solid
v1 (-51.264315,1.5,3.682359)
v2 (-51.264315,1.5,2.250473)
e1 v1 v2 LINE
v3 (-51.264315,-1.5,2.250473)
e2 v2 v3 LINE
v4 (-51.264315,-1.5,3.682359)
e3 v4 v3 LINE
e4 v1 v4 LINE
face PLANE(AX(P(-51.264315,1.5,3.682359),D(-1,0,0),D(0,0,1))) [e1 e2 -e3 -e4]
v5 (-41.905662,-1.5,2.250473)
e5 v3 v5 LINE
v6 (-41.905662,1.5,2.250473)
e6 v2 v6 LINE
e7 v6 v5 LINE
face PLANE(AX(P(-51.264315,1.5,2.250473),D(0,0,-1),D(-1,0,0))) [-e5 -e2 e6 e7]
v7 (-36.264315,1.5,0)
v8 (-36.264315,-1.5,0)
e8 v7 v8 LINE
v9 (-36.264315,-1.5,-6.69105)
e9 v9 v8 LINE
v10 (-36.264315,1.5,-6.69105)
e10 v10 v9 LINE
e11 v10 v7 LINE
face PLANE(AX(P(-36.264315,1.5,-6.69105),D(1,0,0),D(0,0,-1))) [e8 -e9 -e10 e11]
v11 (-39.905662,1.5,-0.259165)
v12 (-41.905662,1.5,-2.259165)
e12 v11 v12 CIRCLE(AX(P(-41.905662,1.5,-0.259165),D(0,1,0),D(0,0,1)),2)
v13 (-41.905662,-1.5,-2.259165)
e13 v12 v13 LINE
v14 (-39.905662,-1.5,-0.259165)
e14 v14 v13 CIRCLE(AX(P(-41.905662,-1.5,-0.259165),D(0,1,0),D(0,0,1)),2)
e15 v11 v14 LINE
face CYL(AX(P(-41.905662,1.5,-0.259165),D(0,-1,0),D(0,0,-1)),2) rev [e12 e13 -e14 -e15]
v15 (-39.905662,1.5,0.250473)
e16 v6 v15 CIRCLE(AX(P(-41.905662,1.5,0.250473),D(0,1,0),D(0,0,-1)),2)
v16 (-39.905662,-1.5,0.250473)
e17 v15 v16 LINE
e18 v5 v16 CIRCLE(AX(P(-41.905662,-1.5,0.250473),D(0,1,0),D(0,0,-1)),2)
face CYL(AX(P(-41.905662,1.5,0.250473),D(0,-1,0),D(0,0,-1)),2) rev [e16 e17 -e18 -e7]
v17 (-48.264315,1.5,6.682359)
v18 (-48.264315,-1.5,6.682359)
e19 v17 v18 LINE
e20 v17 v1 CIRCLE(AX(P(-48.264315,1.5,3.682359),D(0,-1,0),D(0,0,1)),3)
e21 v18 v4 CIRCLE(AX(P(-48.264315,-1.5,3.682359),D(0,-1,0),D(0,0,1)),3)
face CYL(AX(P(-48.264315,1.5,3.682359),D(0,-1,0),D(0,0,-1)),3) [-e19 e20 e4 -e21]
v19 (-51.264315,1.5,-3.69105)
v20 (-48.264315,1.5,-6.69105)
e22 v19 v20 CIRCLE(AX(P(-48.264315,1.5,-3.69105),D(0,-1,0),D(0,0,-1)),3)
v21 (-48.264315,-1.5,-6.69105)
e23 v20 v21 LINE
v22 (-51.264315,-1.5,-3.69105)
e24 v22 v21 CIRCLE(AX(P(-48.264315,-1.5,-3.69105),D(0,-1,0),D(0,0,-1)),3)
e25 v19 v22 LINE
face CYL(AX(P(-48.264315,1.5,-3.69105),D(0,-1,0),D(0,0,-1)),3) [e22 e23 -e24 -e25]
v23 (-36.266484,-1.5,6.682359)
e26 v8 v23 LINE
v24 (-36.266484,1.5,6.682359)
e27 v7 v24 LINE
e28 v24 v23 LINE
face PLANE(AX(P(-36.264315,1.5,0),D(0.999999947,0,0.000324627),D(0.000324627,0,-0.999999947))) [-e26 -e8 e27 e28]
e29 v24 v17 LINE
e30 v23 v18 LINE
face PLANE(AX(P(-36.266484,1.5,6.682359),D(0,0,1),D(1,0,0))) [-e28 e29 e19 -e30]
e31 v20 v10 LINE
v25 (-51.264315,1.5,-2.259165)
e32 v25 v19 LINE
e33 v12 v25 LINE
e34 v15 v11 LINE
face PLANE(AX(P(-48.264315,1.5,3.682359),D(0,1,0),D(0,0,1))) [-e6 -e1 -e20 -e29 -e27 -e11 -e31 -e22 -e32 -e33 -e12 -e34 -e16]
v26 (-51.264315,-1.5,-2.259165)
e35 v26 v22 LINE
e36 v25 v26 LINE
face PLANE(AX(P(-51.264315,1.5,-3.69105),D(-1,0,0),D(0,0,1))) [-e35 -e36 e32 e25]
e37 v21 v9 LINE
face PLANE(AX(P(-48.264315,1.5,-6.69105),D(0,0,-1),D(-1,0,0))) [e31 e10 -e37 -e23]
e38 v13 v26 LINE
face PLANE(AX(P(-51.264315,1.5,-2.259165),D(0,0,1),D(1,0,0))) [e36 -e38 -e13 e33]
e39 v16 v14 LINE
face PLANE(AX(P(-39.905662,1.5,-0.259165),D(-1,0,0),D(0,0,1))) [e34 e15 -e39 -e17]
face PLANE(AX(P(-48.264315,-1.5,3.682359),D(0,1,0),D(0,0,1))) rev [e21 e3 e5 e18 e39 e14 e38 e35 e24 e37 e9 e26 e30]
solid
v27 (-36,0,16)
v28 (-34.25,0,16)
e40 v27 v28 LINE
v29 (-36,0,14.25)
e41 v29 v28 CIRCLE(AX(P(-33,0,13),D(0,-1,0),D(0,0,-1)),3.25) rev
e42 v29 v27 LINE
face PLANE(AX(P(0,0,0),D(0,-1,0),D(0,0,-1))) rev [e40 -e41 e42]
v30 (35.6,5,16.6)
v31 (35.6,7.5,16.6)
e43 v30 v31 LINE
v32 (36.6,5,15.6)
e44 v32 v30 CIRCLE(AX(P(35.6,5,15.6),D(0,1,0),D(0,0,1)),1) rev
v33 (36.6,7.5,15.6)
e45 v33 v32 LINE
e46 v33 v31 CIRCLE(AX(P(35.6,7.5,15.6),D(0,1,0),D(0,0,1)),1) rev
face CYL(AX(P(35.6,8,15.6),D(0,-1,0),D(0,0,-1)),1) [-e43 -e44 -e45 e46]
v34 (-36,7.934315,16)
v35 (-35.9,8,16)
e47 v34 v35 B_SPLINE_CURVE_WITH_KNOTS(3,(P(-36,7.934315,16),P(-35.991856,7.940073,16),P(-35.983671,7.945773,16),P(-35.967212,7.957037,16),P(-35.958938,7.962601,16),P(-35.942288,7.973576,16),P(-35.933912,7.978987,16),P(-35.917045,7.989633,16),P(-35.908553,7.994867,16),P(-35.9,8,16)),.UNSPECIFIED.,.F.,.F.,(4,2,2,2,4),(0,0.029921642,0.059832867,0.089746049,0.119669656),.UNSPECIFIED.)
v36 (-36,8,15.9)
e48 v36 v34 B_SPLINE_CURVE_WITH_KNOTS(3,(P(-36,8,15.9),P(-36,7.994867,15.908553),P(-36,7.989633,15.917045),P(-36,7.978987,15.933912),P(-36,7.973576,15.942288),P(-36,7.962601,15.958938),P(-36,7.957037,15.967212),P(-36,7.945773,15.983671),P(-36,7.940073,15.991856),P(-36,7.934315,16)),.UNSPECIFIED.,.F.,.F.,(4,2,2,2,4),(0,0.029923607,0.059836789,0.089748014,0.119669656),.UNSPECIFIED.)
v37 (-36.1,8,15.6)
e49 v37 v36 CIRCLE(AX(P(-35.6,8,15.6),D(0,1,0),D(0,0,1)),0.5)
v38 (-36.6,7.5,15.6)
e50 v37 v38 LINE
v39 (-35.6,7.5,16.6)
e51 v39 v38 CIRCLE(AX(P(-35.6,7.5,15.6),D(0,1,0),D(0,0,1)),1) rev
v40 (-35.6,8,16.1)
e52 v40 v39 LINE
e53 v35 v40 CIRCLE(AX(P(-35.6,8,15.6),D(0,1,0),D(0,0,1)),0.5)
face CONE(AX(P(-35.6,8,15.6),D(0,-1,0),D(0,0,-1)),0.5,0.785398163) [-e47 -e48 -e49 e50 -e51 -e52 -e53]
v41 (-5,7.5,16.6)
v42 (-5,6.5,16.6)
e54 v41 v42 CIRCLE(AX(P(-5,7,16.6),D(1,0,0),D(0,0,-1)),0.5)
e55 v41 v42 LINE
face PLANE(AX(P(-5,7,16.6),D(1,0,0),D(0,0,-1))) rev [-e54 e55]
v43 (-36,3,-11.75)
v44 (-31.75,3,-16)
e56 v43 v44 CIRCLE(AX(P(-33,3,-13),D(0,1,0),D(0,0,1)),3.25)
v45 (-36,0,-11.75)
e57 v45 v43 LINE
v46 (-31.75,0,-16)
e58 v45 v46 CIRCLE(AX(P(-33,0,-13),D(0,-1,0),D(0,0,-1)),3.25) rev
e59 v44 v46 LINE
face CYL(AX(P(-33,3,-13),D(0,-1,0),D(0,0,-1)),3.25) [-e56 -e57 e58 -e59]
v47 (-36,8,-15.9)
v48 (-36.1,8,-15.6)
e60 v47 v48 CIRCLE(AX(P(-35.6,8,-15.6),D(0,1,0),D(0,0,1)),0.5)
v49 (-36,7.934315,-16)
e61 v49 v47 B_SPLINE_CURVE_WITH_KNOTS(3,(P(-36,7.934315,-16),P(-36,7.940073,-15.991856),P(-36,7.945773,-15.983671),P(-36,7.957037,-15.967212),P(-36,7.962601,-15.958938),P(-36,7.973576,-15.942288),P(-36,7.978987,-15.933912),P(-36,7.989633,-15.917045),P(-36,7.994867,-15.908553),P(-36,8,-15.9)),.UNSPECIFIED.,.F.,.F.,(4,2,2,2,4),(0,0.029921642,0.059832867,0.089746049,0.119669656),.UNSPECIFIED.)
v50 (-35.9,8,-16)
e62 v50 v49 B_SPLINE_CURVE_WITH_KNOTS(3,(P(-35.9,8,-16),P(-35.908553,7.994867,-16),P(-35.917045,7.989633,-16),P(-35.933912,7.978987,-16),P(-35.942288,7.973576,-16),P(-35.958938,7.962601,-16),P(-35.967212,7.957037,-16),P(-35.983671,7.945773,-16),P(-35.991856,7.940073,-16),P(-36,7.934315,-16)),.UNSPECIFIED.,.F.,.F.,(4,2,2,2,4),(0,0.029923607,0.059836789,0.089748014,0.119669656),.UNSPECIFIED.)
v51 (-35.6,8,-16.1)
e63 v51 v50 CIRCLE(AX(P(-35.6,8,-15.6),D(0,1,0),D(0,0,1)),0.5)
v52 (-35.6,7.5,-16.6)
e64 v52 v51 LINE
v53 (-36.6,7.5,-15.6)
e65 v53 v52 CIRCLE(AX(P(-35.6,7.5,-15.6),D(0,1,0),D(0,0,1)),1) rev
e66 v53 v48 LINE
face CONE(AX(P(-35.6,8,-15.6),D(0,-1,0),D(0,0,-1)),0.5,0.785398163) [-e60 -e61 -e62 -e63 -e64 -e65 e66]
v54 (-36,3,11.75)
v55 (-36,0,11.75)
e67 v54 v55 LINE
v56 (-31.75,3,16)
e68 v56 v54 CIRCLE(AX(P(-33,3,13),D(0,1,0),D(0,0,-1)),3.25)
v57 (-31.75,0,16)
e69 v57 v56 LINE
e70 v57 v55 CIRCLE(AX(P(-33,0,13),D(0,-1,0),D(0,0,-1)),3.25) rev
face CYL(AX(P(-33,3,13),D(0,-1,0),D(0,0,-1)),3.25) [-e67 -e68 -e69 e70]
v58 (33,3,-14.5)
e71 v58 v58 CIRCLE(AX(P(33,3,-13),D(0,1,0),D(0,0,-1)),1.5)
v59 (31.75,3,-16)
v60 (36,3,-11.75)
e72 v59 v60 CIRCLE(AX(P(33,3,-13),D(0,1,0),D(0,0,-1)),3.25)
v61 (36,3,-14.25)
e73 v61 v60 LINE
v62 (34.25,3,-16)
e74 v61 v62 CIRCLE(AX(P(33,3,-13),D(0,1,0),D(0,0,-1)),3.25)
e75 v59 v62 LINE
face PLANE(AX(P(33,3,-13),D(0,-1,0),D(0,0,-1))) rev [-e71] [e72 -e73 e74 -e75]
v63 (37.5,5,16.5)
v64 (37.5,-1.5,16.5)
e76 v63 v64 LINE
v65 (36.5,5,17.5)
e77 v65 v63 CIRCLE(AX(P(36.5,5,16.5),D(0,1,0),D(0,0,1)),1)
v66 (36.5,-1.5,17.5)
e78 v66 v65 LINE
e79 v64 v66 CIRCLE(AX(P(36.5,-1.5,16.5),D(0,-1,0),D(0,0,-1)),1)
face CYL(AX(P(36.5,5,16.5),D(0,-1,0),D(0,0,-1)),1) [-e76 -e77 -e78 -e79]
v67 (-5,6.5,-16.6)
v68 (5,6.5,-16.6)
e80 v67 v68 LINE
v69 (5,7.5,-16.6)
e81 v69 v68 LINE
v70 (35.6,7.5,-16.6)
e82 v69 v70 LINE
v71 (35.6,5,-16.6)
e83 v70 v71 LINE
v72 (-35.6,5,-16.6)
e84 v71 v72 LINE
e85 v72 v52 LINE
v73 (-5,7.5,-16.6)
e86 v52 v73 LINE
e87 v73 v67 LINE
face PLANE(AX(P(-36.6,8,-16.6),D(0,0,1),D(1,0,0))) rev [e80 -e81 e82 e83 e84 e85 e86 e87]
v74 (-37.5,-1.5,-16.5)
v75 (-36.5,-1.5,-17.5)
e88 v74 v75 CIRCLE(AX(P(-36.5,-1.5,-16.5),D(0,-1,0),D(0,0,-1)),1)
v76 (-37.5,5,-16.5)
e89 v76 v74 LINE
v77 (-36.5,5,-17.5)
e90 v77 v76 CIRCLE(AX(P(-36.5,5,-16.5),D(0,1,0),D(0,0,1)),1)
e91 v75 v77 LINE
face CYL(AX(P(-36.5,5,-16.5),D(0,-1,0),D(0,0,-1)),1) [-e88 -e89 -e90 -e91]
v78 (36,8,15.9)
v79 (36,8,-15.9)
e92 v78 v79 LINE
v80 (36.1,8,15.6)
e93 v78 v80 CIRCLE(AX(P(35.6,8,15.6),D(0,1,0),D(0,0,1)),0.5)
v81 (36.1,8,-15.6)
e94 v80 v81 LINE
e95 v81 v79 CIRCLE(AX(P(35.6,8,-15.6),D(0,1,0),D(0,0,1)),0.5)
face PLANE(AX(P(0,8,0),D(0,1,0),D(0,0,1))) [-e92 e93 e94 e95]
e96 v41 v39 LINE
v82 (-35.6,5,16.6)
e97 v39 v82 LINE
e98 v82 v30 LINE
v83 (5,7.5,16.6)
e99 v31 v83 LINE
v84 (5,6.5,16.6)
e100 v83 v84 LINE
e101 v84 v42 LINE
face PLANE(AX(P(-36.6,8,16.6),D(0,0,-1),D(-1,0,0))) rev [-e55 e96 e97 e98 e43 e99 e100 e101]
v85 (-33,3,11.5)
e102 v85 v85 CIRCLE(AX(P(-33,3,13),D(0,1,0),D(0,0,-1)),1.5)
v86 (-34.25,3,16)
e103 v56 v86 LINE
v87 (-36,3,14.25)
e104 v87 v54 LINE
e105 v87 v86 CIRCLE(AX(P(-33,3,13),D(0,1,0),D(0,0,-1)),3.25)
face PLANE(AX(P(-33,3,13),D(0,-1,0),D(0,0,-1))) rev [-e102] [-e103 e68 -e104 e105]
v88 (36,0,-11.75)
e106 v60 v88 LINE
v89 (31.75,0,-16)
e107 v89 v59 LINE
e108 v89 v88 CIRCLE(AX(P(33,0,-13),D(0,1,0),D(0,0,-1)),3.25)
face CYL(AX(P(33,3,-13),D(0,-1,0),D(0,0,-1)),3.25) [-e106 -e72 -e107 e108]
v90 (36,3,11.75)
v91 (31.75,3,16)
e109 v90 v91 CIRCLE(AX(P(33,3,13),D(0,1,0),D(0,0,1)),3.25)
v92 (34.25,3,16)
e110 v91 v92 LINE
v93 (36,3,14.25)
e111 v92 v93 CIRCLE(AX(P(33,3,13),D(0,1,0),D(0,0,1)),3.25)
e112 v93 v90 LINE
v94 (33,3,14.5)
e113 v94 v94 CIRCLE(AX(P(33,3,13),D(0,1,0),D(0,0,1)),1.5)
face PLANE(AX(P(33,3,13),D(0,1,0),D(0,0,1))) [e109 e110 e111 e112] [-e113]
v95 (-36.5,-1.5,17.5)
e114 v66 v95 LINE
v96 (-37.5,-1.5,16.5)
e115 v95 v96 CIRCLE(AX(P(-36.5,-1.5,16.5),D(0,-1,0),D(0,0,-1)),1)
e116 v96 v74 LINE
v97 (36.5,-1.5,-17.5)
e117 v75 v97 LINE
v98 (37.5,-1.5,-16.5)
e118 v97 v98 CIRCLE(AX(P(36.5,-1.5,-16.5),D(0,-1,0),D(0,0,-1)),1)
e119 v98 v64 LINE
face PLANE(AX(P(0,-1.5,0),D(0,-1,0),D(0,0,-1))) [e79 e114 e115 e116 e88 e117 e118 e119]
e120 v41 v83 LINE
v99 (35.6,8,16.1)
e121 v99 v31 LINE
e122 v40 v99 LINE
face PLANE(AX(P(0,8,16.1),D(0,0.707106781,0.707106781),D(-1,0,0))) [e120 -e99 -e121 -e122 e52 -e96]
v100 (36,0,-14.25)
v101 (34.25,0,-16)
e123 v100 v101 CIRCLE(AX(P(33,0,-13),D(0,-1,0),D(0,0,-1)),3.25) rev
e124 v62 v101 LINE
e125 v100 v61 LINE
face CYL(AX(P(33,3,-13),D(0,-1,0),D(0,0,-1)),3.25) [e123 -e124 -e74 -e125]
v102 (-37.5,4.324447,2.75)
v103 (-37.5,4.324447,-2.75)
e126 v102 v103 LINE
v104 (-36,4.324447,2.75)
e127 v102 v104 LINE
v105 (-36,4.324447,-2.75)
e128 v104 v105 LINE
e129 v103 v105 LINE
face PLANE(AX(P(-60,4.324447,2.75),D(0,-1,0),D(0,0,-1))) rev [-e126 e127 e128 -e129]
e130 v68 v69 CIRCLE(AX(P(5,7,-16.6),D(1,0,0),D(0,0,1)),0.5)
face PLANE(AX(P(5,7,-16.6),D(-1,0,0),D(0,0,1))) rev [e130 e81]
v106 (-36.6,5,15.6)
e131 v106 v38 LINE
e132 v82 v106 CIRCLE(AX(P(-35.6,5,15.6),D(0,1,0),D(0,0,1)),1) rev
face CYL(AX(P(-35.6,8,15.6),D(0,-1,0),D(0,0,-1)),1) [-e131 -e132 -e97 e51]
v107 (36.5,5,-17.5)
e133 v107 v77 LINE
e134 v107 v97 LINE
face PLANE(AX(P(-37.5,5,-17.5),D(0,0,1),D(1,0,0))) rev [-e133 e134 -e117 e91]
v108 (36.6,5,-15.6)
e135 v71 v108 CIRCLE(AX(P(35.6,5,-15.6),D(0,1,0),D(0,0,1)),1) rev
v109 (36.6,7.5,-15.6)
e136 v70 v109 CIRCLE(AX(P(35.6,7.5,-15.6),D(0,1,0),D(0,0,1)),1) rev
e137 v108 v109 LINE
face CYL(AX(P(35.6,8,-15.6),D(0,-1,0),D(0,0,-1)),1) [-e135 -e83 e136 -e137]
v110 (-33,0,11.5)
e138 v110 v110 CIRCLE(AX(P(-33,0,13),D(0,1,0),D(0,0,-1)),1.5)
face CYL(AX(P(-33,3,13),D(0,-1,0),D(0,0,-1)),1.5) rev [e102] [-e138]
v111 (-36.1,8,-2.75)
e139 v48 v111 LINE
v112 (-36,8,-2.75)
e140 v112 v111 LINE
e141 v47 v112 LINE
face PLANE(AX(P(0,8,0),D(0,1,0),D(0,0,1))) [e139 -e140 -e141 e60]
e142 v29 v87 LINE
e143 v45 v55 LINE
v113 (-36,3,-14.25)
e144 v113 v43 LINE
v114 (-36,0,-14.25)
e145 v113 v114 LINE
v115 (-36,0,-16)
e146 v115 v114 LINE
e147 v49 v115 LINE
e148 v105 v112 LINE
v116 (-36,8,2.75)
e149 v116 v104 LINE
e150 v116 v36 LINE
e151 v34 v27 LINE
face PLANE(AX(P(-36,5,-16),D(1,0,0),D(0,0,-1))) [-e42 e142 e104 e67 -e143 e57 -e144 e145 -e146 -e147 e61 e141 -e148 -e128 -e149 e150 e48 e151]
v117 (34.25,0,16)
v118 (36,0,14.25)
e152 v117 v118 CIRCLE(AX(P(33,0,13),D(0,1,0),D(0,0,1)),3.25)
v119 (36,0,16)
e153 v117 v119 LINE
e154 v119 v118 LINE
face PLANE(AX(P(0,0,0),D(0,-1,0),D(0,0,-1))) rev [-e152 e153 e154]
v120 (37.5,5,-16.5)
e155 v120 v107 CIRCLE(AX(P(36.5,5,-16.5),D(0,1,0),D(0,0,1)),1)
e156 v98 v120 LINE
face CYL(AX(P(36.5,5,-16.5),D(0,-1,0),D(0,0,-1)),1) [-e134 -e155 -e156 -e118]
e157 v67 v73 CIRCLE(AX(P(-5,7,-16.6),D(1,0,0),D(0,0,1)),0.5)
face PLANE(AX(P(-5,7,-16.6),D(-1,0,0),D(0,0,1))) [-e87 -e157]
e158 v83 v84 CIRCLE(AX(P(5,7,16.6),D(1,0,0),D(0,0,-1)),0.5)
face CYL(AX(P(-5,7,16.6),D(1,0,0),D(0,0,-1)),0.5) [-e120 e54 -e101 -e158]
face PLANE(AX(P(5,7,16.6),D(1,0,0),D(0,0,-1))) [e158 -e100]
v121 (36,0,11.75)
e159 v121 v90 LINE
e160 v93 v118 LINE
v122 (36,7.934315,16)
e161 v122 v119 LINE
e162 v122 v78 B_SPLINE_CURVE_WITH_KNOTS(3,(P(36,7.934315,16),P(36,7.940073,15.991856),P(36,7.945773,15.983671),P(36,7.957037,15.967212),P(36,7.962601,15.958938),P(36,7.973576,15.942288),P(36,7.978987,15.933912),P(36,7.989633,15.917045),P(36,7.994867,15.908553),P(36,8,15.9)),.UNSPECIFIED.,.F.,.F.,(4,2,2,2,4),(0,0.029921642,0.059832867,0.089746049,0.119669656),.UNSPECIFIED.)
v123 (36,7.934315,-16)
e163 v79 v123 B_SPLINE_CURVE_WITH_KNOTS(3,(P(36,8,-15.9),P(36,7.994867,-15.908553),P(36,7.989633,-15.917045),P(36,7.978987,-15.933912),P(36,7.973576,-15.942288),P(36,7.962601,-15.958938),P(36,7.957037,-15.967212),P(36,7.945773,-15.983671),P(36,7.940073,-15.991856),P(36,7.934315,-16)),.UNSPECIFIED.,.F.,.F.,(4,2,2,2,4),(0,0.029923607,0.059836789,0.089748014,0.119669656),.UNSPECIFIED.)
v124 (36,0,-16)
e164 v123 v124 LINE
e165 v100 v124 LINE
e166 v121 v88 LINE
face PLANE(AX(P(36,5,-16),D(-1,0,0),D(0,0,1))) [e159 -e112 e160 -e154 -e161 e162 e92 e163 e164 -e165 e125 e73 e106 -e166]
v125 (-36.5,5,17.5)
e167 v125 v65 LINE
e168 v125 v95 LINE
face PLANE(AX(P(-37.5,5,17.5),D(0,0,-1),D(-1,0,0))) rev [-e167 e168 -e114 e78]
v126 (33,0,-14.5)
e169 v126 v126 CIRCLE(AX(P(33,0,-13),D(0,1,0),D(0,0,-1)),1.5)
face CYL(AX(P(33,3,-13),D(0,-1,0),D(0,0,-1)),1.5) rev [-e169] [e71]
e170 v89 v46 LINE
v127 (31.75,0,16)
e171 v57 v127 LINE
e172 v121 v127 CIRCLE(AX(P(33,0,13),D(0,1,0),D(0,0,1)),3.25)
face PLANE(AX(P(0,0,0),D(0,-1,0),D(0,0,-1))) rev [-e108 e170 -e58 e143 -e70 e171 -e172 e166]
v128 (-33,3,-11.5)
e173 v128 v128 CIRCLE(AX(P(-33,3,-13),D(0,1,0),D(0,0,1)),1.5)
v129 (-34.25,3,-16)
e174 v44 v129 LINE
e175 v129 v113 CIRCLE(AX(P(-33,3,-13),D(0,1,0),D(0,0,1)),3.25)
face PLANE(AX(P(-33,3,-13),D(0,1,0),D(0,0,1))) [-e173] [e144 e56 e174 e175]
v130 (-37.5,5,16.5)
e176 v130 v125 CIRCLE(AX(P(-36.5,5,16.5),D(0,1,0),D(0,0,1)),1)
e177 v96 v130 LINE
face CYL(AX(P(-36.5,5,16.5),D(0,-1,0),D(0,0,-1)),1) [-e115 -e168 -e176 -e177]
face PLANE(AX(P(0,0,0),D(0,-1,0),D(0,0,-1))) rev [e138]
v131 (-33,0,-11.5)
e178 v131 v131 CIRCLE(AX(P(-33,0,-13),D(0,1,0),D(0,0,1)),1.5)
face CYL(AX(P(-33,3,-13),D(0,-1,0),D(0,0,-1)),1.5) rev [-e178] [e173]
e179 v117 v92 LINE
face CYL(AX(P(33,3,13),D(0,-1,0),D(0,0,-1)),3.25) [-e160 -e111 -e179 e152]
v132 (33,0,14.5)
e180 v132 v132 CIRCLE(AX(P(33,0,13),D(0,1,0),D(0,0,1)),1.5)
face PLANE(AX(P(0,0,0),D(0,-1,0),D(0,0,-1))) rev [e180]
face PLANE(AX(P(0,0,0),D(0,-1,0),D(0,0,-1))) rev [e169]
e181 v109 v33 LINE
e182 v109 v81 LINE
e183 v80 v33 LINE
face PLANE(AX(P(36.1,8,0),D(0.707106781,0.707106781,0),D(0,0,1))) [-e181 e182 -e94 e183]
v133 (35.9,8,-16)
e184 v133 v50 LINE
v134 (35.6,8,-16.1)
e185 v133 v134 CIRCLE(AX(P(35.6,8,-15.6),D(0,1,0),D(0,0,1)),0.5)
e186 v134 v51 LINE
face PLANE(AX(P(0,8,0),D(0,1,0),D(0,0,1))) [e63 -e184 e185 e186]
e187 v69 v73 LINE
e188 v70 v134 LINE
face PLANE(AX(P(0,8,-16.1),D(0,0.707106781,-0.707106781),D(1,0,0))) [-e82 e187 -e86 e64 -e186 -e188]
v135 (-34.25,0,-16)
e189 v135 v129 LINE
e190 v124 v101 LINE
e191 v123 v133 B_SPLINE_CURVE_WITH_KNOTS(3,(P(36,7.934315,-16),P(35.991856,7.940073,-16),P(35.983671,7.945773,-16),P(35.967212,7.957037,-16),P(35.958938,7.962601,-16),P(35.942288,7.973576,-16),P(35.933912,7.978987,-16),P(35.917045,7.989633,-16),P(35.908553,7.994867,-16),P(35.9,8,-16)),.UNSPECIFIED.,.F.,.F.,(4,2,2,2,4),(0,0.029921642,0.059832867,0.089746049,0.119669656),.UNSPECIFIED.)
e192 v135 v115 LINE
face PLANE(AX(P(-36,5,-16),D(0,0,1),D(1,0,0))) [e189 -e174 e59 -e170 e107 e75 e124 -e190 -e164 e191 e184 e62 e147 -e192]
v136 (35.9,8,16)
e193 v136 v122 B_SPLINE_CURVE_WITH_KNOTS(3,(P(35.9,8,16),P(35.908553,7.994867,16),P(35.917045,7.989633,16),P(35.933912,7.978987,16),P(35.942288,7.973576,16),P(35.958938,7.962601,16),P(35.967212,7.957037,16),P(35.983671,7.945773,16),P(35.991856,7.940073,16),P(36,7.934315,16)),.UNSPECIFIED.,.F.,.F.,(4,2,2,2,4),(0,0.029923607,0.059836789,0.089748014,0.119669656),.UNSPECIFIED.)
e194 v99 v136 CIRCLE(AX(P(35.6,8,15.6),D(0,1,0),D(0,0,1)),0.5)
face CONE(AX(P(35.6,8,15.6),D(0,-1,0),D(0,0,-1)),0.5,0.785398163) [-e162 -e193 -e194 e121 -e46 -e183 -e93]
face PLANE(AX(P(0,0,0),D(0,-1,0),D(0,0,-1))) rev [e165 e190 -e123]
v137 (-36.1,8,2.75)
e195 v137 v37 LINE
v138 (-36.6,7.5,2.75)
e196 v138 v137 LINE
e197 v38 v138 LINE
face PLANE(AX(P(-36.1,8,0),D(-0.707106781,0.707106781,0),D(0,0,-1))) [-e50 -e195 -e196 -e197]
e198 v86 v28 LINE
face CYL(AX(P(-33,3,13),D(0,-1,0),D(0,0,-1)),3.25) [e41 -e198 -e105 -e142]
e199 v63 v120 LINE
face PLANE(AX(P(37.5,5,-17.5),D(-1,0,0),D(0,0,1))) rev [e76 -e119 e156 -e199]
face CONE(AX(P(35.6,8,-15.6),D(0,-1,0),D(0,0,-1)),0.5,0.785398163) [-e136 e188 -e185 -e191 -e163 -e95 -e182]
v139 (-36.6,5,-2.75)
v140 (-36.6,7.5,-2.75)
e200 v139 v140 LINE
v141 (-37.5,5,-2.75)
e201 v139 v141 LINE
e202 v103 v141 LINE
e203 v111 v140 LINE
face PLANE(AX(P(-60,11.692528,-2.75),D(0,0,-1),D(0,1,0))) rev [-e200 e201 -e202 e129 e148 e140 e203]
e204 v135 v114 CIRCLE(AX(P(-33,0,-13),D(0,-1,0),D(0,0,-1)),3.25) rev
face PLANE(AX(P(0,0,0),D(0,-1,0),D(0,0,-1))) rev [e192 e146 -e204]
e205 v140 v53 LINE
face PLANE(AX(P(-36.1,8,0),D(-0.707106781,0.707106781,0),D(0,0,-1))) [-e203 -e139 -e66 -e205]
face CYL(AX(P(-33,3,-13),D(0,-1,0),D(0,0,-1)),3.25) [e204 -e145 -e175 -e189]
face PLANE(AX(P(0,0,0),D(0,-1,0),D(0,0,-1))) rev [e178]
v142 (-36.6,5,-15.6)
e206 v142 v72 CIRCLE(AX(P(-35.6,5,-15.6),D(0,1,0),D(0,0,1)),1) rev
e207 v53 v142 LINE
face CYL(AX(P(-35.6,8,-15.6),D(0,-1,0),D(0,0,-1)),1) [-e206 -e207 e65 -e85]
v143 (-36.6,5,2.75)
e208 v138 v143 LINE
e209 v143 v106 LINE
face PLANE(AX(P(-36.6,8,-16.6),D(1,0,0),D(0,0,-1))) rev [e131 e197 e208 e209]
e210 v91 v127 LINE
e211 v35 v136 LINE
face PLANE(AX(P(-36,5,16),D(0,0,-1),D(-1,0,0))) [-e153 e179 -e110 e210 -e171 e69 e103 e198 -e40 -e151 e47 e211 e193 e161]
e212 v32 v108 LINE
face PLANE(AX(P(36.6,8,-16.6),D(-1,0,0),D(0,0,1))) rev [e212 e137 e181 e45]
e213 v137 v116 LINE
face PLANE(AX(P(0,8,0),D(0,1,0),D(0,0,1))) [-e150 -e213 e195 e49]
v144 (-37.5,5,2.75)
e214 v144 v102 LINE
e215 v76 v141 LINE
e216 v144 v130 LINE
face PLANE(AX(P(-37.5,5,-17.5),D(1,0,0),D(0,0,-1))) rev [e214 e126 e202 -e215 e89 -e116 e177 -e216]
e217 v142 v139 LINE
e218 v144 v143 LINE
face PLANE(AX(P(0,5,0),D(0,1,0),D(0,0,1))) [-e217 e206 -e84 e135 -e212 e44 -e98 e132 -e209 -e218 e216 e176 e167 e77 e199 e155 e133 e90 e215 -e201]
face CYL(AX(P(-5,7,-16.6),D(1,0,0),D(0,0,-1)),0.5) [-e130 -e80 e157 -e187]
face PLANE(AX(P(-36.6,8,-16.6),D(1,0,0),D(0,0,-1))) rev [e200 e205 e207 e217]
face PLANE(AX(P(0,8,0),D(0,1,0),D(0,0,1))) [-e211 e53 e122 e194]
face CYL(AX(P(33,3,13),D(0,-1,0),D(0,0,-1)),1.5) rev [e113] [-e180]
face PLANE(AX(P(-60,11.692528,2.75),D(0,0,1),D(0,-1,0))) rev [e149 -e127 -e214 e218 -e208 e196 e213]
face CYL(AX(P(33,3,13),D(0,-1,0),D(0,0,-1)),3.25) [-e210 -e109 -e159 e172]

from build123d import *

# Parameters (mm, degrees)
SKETCH_6_W           = 75
SKETCH_6_H           = 35
SKETCH_6_W_2         = 72
SKETCH_6_H_2         = 32
EXTRUDE_2_DEPTH      = 5
SKETCH_7_W           = 75
SKETCH_7_H           = 35
EXTRUDE_3_DEPTH      = 1.5
FILLET_2_R           = 1
SKETCH_8_R           = 3.25
SKETCH_8_R_2         = 1.5
EXTRUDE_4_DEPTH      = 3
EXTRUDE_5_DEPTH      = 3
SKETCH_10_W          = 73.2
SKETCH_10_H          = 33.2
SKETCH_10_W_2        = 72
SKETCH_10_H_2        = 32
EXTRUDE_6_DEPTH      = 3
FILLET_5_R           = 1
SKETCH_11_W          = 5.5
SKETCH_11_H          = 7.368080292
CUT_EXTRUDE_1_DEPTH  = 60
EXTRUDE_7_DEPTH      = 5
EXTRUDE_7_DEPTH_BACK = 5
SKETCH_12_R          = 0.5
CHAMFER_1_SIZE       = 0.5


with BuildPart() as part:
    # Эскиз6 → Бобышка-Вытянуть2 (new body)
    with BuildSketch(Plane(origin=(0, 0, 0), x_dir=(1, 0, 0), z_dir=(0, 1, 0))):
        Rectangle(SKETCH_6_W, SKETCH_6_H)
        Rectangle(SKETCH_6_W_2, SKETCH_6_H_2, mode=Mode.SUBTRACT)
    extrude(amount=EXTRUDE_2_DEPTH)

    # Эскиз7 → Бобышка-Вытянуть3 (add)
    with BuildSketch(Plane.XZ):
        Rectangle(SKETCH_7_W, SKETCH_7_H)
    extrude(amount=EXTRUDE_3_DEPTH)

    # Скругление2
    fillet_2_edges = [part.edges().sort_by_distance(p)[0] for p in [
        (37.5, 1.75, 17.5),
        (-37.5, 1.75, 17.5),
        (-37.5, 1.75, -17.5),
        (37.5, 1.75, -17.5),
    ]]
    fillet(fillet_2_edges, radius=FILLET_2_R)

    # Эскиз8 → Бобышка-Вытянуть4 (add)
    # profile 1 of 4: a face of its own
    with BuildSketch(Plane(origin=(0, 0, 0), x_dir=(1, 0, 0), z_dir=(0, 1, 0))):
        with Locations((-33, 13)):
            Circle(SKETCH_8_R)
        with Locations(Location((-33, 13, 0), (0, 0, 270))):
            Circle(SKETCH_8_R_2, mode=Mode.SUBTRACT)
    # profile 2 of 4: a face of its own
    with BuildSketch(Plane(origin=(0, 0, 0), x_dir=(1, 0, 0), z_dir=(0, 1, 0))):
        with Locations((-33, -13)):
            Circle(SKETCH_8_R)
        with Locations(Location((-33, -13, 0), (0, 0, 90))):
            Circle(SKETCH_8_R_2, mode=Mode.SUBTRACT)
    # profile 3 of 4: a face of its own
    with BuildSketch(Plane(origin=(0, 0, 0), x_dir=(1, 0, 0), z_dir=(0, 1, 0))):
        with Locations((33, 13)):
            Circle(SKETCH_8_R)
        with Locations(Location((33, 13, 0), (0, 0, 90))):
            Circle(SKETCH_8_R_2, mode=Mode.SUBTRACT)
    # profile 4 of 4: a face of its own
    with BuildSketch(Plane(origin=(0, 0, 0), x_dir=(1, 0, 0), z_dir=(0, 1, 0))):
        with Locations((33, -13)):
            Circle(SKETCH_8_R)
        with Locations(Location((33, -13, 0), (0, 0, 270))):
            Circle(SKETCH_8_R_2, mode=Mode.SUBTRACT)
    extrude(amount=EXTRUDE_4_DEPTH)

    # Эскиз10 → Бобышка-Вытянуть6 (add)
    with BuildSketch(Plane(origin=(0, 5, 0), x_dir=(1, 0, 0), z_dir=(0, 1, 0))):
        Rectangle(SKETCH_10_W, SKETCH_10_H)
        Rectangle(SKETCH_10_W_2, SKETCH_10_H_2, mode=Mode.SUBTRACT)
    extrude(amount=EXTRUDE_6_DEPTH)

    # Скругление5
    fillet_5_edges = [part.edges().sort_by_distance(p)[0] for p in [
        (-36.6, 6.5, -16.6),
        (-36.6, 6.5, 16.6),
        (36.6, 6.5, 16.6),
        (36.6, 6.5, -16.6),
    ]]
    fillet(fillet_5_edges, radius=FILLET_5_R)

    # Эскиз11 → Вырез-Вытянуть1 (cut)
    with BuildSketch(Plane(origin=(0, 0, 0), x_dir=(0, 0, -1), z_dir=(1, 0, 0))):
        with Locations((0, 8.00848738)):
            Rectangle(SKETCH_11_W, SKETCH_11_H)
    extrude(amount=-CUT_EXTRUDE_1_DEPTH, mode=Mode.SUBTRACT)

    # Эскиз12 → Бобышка-Вытянуть7 (add, two sides: drawn at the far end of the back side and taken through both)
    with BuildSketch(Plane(origin=(0, 0, 0), x_dir=(0, 0, -1), z_dir=(1, 0, 0)).offset(-EXTRUDE_7_DEPTH_BACK)):
        with Locations((-16.6, 7)):
            Circle(SKETCH_12_R)
        with Locations((16.6, 7)):
            Circle(SKETCH_12_R)
    extrude(amount=EXTRUDE_7_DEPTH + EXTRUDE_7_DEPTH_BACK)

    # Фаска1
    # the kernel refuses this chamfer: 0.5 mm, written as the material it takes off along each edge
    with BuildSketch(Plane(origin=(36.6, 8, -15.6), x_dir=(-0.9996219169112968, 0.02749587661058574, 0), z_dir=(0, 0, 1))) as chamfer_1_piece_1:
        Polygon((CHAMFER_1_SIZE * 0.999621916911, CHAMFER_1_SIZE * 0.0274958766106), (-CHAMFER_1_SIZE * 0.0274958766106, CHAMFER_1_SIZE * 0.999621916911), (0, 0), align=None)
    extrude(amount=31.2, mode=Mode.SUBTRACT)
    with BuildSketch(Plane(origin=(35.6, 8, 16.6), x_dir=(0, 0.02749587661058555, -0.9996219169112968), z_dir=(-1, 0, 0))) as chamfer_1_piece_2_section:
        Polygon((CHAMFER_1_SIZE * 0.999621916911, CHAMFER_1_SIZE * 0.0274958766106), (-CHAMFER_1_SIZE * 0.0274958766106, CHAMFER_1_SIZE * 0.999621916911), (0, 0), align=None)
    chamfer_1_piece_2 = extrude(amount=71.2, mode=Mode.PRIVATE)
    chamfer_1_piece_2 = split(chamfer_1_piece_2, bisect_by=Plane(origin=(5, 7.835672891, 16.434803325), z_dir=(1, 0, 0)), keep=Keep.TOP, mode=Mode.PRIVATE)
    chamfer_1_piece_2 = chamfer_1_piece_2 - Plane(origin=(20.3, 7, 16.6), x_dir=(0, 0, -1), z_dir=(-1, 0, 0)) * Cylinder(0.5, 145, mode=Mode.PRIVATE)
    add(chamfer_1_piece_2, mode=Mode.SUBTRACT)
    with BuildSketch(Plane(origin=(35.6, 8, 16.6), x_dir=(0, 0.02749587661058555, -0.9996219169112968), z_dir=(-1, 0, 0))) as chamfer_1_piece_3_section:
        Polygon((CHAMFER_1_SIZE * 0.999621916911, CHAMFER_1_SIZE * 0.0274958766106), (-CHAMFER_1_SIZE * 0.0274958766106, CHAMFER_1_SIZE * 0.999621916911), (0, 0), align=None)
    chamfer_1_piece_3 = extrude(amount=71.2, mode=Mode.PRIVATE)
    chamfer_1_piece_3 = split(chamfer_1_piece_3, bisect_by=Plane(origin=(5, 7.835672891, 16.434803325), z_dir=(-1, 0, 0)), keep=Keep.TOP, mode=Mode.PRIVATE)
    chamfer_1_piece_3 = split(chamfer_1_piece_3, bisect_by=Plane(origin=(-5, 7.835672891, 16.434803325), z_dir=(1, 0, 0)), keep=Keep.TOP, mode=Mode.PRIVATE)
    chamfer_1_piece_3 = chamfer_1_piece_3 - Plane(origin=(0, 7, 16.6), x_dir=(0, 0, -1), z_dir=(-1, 0, 0)) * Cylinder(0.5, 145, mode=Mode.PRIVATE)
    add(chamfer_1_piece_3, mode=Mode.SUBTRACT)
    with BuildSketch(Plane(origin=(35.6, 8, 16.6), x_dir=(0, 0.02749587661058555, -0.9996219169112968), z_dir=(-1, 0, 0))) as chamfer_1_piece_4_section:
        Polygon((CHAMFER_1_SIZE * 0.999621916911, CHAMFER_1_SIZE * 0.0274958766106), (-CHAMFER_1_SIZE * 0.0274958766106, CHAMFER_1_SIZE * 0.999621916911), (0, 0), align=None)
    chamfer_1_piece_4 = extrude(amount=71.2, mode=Mode.PRIVATE)
    chamfer_1_piece_4 = split(chamfer_1_piece_4, bisect_by=Plane(origin=(-5, 7.835672891, 16.434803325), z_dir=(-1, 0, 0)), keep=Keep.TOP, mode=Mode.PRIVATE)
    chamfer_1_piece_4 = chamfer_1_piece_4 - Plane(origin=(-20.3, 7, 16.6), x_dir=(0, 0, -1), z_dir=(-1, 0, 0)) * Cylinder(0.5, 145, mode=Mode.PRIVATE)
    add(chamfer_1_piece_4, mode=Mode.SUBTRACT)
    with BuildSketch(Plane(origin=(-36.6, 8, -1.464158506), x_dir=(0.9996219169112968, 0.02749587661058574, 0), z_dir=(0, 0, -1)), Plane(origin=(-36.6, 8, 15.6), x_dir=(0.9996219169112968, 0.02749587661058574, 0), z_dir=(0, 0, -1))) as chamfer_1_piece_5:
        Polygon((CHAMFER_1_SIZE * 0.999621916911, CHAMFER_1_SIZE * 0.0274958766106), (-CHAMFER_1_SIZE * 0.0274958766106, CHAMFER_1_SIZE * 0.999621916911), (0, 0), align=None)
    extrude(amount=14.135841494, mode=Mode.SUBTRACT)
    with BuildSketch(Plane(origin=(-35.6, 8, -16.6), x_dir=(0, 0.02749587661058555, 0.9996219169112968), z_dir=(1, 0, 0))) as chamfer_1_piece_6_section:
        Polygon((CHAMFER_1_SIZE * 0.999621916911, CHAMFER_1_SIZE * 0.0274958766106), (-CHAMFER_1_SIZE * 0.0274958766106, CHAMFER_1_SIZE * 0.999621916911), (0, 0), align=None)
    chamfer_1_piece_6 = extrude(amount=71.2, mode=Mode.PRIVATE)
    chamfer_1_piece_6 = chamfer_1_piece_6 - Plane(origin=(-20.3, 7, -16.6), x_dir=(0, 0, -1), z_dir=(-1, 0, 0)) * Cylinder(0.5, 145, mode=Mode.PRIVATE)
    chamfer_1_piece_6 = split(chamfer_1_piece_6, bisect_by=Plane(origin=(-5, 7.835672891, -16.434803325), z_dir=(-1, 0, 0)), keep=Keep.TOP, mode=Mode.PRIVATE)
    add(chamfer_1_piece_6, mode=Mode.SUBTRACT)
    with BuildSketch(Plane(origin=(-35.6, 8, -16.6), x_dir=(0, 0.02749587661058555, 0.9996219169112968), z_dir=(1, 0, 0))) as chamfer_1_piece_7_section:
        Polygon((CHAMFER_1_SIZE * 0.999621916911, CHAMFER_1_SIZE * 0.0274958766106), (-CHAMFER_1_SIZE * 0.0274958766106, CHAMFER_1_SIZE * 0.999621916911), (0, 0), align=None)
    chamfer_1_piece_7 = extrude(amount=71.2, mode=Mode.PRIVATE)
    chamfer_1_piece_7 = split(chamfer_1_piece_7, bisect_by=Plane(origin=(5, 7.835672891, -16.434803325), z_dir=(-1, 0, 0)), keep=Keep.TOP, mode=Mode.PRIVATE)
    chamfer_1_piece_7 = chamfer_1_piece_7 - Plane(origin=(0, 7, -16.6), x_dir=(0, 0, -1), z_dir=(-1, 0, 0)) * Cylinder(0.5, 145, mode=Mode.PRIVATE)
    chamfer_1_piece_7 = split(chamfer_1_piece_7, bisect_by=Plane(origin=(-5, 7.835672891, -16.434803325), z_dir=(1, 0, 0)), keep=Keep.TOP, mode=Mode.PRIVATE)
    add(chamfer_1_piece_7, mode=Mode.SUBTRACT)
    with BuildSketch(Plane(origin=(-35.6, 8, -16.6), x_dir=(0, 0.02749587661058555, 0.9996219169112968), z_dir=(1, 0, 0))) as chamfer_1_piece_8_section:
        Polygon((CHAMFER_1_SIZE * 0.999621916911, CHAMFER_1_SIZE * 0.0274958766106), (-CHAMFER_1_SIZE * 0.0274958766106, CHAMFER_1_SIZE * 0.999621916911), (0, 0), align=None)
    chamfer_1_piece_8 = extrude(amount=71.2, mode=Mode.PRIVATE)
    chamfer_1_piece_8 = split(chamfer_1_piece_8, bisect_by=Plane(origin=(5, 7.835672891, -16.434803325), z_dir=(1, 0, 0)), keep=Keep.TOP, mode=Mode.PRIVATE)
    chamfer_1_piece_8 = chamfer_1_piece_8 - Plane(origin=(20.3, 7, -16.6), x_dir=(0, 0, -1), z_dir=(-1, 0, 0)) * Cylinder(0.5, 145, mode=Mode.PRIVATE)
    add(chamfer_1_piece_8, mode=Mode.SUBTRACT)
    with BuildSketch(Plane(origin=(-35.6, 8, -15.6), x_dir=(-1, 0, 0), z_dir=(0, 0, 1))) as chamfer_1_piece_9:
        Polygon((1, CHAMFER_1_SIZE), (1 - CHAMFER_1_SIZE, 0), (1, 0), align=None)
    revolve(axis=Axis((-35.6, 8, -15.6), (0, -1, 0)), revolution_arc=90, mode=Mode.SUBTRACT)
    with BuildSketch(Plane(origin=(-35.6, 8, 15.6), x_dir=(-1, 0, 0), z_dir=(0, 0, -1))) as chamfer_1_piece_10:
        Polygon((1 - CHAMFER_1_SIZE, 0), (1, -CHAMFER_1_SIZE), (1, 0), align=None)
    revolve(axis=Axis((-35.6, 8, 15.6), (0, 1, 0)), revolution_arc=90, mode=Mode.SUBTRACT)
    with BuildSketch(Plane(origin=(35.6, 8, -15.6), x_dir=(1, 0, 0), z_dir=(0, 0, 1))) as chamfer_1_piece_11:
        Polygon((1 - CHAMFER_1_SIZE, 0), (1, -CHAMFER_1_SIZE), (1, 0), align=None)
    revolve(axis=Axis((35.6, 8, -15.6), (0, 1, 0)), revolution_arc=90, mode=Mode.SUBTRACT)
    with BuildSketch(Plane(origin=(35.6, 8, 15.6), x_dir=(0, 0, 1), z_dir=(-1, 0, 0))) as chamfer_1_piece_12:
        Polygon((1 - CHAMFER_1_SIZE, 0), (1, -CHAMFER_1_SIZE), (1, 0), align=None)
    revolve(axis=Axis((35.6, 8, 15.6), (0, 1, 0)), revolution_arc=90, mode=Mode.SUBTRACT)


with BuildPart() as body_2:
    # Эскиз9 → Бобышка-Вытянуть5 (new body)
    with BuildSketch(Plane.XZ.offset(1.5)):
        with BuildLine():
            Line((-36.264314741, -6.691050367), (-36.264314741, 0))
            Line((-36.264314741, 0), (-36.266484017, 6.682359232))
            Line((-36.266484017, 6.682359232), (-48.264314741, 6.682359232))
            ThreePointArc((-48.264314741, 6.682359232), (-50.385635084, 5.803679576), (-51.264314741, 3.682359232))
            Line((-51.264314741, 3.682359232), (-51.264314741, 2.250473493))
            Line((-51.264314741, 2.250473493), (-41.905662099, 2.250473493))
            ThreePointArc((-41.905662099, 2.250473493), (-40.491448537, 1.664687055), (-39.905662099, 0.250473493))
            Line((-39.905662099, 0.250473493), (-39.905662099, -0.259164628))
            ThreePointArc((-39.905662099, -0.259164628), (-40.491448537, -1.67337819), (-41.905662099, -2.259164628))
            Line((-41.905662099, -2.259164628), (-51.264314741, -2.259164628))
            Line((-51.264314741, -2.259164628), (-51.264314741, -3.691050367))
            ThreePointArc((-51.264314741, -3.691050367), (-50.385635084, -5.812370711), (-48.264314741, -6.691050367))
            Line((-48.264314741, -6.691050367), (-36.264314741, -6.691050367))
        make_face()
    extrude(amount=-EXTRUDE_5_DEPTH)


solid = Compound([part.part, body_2.part])
